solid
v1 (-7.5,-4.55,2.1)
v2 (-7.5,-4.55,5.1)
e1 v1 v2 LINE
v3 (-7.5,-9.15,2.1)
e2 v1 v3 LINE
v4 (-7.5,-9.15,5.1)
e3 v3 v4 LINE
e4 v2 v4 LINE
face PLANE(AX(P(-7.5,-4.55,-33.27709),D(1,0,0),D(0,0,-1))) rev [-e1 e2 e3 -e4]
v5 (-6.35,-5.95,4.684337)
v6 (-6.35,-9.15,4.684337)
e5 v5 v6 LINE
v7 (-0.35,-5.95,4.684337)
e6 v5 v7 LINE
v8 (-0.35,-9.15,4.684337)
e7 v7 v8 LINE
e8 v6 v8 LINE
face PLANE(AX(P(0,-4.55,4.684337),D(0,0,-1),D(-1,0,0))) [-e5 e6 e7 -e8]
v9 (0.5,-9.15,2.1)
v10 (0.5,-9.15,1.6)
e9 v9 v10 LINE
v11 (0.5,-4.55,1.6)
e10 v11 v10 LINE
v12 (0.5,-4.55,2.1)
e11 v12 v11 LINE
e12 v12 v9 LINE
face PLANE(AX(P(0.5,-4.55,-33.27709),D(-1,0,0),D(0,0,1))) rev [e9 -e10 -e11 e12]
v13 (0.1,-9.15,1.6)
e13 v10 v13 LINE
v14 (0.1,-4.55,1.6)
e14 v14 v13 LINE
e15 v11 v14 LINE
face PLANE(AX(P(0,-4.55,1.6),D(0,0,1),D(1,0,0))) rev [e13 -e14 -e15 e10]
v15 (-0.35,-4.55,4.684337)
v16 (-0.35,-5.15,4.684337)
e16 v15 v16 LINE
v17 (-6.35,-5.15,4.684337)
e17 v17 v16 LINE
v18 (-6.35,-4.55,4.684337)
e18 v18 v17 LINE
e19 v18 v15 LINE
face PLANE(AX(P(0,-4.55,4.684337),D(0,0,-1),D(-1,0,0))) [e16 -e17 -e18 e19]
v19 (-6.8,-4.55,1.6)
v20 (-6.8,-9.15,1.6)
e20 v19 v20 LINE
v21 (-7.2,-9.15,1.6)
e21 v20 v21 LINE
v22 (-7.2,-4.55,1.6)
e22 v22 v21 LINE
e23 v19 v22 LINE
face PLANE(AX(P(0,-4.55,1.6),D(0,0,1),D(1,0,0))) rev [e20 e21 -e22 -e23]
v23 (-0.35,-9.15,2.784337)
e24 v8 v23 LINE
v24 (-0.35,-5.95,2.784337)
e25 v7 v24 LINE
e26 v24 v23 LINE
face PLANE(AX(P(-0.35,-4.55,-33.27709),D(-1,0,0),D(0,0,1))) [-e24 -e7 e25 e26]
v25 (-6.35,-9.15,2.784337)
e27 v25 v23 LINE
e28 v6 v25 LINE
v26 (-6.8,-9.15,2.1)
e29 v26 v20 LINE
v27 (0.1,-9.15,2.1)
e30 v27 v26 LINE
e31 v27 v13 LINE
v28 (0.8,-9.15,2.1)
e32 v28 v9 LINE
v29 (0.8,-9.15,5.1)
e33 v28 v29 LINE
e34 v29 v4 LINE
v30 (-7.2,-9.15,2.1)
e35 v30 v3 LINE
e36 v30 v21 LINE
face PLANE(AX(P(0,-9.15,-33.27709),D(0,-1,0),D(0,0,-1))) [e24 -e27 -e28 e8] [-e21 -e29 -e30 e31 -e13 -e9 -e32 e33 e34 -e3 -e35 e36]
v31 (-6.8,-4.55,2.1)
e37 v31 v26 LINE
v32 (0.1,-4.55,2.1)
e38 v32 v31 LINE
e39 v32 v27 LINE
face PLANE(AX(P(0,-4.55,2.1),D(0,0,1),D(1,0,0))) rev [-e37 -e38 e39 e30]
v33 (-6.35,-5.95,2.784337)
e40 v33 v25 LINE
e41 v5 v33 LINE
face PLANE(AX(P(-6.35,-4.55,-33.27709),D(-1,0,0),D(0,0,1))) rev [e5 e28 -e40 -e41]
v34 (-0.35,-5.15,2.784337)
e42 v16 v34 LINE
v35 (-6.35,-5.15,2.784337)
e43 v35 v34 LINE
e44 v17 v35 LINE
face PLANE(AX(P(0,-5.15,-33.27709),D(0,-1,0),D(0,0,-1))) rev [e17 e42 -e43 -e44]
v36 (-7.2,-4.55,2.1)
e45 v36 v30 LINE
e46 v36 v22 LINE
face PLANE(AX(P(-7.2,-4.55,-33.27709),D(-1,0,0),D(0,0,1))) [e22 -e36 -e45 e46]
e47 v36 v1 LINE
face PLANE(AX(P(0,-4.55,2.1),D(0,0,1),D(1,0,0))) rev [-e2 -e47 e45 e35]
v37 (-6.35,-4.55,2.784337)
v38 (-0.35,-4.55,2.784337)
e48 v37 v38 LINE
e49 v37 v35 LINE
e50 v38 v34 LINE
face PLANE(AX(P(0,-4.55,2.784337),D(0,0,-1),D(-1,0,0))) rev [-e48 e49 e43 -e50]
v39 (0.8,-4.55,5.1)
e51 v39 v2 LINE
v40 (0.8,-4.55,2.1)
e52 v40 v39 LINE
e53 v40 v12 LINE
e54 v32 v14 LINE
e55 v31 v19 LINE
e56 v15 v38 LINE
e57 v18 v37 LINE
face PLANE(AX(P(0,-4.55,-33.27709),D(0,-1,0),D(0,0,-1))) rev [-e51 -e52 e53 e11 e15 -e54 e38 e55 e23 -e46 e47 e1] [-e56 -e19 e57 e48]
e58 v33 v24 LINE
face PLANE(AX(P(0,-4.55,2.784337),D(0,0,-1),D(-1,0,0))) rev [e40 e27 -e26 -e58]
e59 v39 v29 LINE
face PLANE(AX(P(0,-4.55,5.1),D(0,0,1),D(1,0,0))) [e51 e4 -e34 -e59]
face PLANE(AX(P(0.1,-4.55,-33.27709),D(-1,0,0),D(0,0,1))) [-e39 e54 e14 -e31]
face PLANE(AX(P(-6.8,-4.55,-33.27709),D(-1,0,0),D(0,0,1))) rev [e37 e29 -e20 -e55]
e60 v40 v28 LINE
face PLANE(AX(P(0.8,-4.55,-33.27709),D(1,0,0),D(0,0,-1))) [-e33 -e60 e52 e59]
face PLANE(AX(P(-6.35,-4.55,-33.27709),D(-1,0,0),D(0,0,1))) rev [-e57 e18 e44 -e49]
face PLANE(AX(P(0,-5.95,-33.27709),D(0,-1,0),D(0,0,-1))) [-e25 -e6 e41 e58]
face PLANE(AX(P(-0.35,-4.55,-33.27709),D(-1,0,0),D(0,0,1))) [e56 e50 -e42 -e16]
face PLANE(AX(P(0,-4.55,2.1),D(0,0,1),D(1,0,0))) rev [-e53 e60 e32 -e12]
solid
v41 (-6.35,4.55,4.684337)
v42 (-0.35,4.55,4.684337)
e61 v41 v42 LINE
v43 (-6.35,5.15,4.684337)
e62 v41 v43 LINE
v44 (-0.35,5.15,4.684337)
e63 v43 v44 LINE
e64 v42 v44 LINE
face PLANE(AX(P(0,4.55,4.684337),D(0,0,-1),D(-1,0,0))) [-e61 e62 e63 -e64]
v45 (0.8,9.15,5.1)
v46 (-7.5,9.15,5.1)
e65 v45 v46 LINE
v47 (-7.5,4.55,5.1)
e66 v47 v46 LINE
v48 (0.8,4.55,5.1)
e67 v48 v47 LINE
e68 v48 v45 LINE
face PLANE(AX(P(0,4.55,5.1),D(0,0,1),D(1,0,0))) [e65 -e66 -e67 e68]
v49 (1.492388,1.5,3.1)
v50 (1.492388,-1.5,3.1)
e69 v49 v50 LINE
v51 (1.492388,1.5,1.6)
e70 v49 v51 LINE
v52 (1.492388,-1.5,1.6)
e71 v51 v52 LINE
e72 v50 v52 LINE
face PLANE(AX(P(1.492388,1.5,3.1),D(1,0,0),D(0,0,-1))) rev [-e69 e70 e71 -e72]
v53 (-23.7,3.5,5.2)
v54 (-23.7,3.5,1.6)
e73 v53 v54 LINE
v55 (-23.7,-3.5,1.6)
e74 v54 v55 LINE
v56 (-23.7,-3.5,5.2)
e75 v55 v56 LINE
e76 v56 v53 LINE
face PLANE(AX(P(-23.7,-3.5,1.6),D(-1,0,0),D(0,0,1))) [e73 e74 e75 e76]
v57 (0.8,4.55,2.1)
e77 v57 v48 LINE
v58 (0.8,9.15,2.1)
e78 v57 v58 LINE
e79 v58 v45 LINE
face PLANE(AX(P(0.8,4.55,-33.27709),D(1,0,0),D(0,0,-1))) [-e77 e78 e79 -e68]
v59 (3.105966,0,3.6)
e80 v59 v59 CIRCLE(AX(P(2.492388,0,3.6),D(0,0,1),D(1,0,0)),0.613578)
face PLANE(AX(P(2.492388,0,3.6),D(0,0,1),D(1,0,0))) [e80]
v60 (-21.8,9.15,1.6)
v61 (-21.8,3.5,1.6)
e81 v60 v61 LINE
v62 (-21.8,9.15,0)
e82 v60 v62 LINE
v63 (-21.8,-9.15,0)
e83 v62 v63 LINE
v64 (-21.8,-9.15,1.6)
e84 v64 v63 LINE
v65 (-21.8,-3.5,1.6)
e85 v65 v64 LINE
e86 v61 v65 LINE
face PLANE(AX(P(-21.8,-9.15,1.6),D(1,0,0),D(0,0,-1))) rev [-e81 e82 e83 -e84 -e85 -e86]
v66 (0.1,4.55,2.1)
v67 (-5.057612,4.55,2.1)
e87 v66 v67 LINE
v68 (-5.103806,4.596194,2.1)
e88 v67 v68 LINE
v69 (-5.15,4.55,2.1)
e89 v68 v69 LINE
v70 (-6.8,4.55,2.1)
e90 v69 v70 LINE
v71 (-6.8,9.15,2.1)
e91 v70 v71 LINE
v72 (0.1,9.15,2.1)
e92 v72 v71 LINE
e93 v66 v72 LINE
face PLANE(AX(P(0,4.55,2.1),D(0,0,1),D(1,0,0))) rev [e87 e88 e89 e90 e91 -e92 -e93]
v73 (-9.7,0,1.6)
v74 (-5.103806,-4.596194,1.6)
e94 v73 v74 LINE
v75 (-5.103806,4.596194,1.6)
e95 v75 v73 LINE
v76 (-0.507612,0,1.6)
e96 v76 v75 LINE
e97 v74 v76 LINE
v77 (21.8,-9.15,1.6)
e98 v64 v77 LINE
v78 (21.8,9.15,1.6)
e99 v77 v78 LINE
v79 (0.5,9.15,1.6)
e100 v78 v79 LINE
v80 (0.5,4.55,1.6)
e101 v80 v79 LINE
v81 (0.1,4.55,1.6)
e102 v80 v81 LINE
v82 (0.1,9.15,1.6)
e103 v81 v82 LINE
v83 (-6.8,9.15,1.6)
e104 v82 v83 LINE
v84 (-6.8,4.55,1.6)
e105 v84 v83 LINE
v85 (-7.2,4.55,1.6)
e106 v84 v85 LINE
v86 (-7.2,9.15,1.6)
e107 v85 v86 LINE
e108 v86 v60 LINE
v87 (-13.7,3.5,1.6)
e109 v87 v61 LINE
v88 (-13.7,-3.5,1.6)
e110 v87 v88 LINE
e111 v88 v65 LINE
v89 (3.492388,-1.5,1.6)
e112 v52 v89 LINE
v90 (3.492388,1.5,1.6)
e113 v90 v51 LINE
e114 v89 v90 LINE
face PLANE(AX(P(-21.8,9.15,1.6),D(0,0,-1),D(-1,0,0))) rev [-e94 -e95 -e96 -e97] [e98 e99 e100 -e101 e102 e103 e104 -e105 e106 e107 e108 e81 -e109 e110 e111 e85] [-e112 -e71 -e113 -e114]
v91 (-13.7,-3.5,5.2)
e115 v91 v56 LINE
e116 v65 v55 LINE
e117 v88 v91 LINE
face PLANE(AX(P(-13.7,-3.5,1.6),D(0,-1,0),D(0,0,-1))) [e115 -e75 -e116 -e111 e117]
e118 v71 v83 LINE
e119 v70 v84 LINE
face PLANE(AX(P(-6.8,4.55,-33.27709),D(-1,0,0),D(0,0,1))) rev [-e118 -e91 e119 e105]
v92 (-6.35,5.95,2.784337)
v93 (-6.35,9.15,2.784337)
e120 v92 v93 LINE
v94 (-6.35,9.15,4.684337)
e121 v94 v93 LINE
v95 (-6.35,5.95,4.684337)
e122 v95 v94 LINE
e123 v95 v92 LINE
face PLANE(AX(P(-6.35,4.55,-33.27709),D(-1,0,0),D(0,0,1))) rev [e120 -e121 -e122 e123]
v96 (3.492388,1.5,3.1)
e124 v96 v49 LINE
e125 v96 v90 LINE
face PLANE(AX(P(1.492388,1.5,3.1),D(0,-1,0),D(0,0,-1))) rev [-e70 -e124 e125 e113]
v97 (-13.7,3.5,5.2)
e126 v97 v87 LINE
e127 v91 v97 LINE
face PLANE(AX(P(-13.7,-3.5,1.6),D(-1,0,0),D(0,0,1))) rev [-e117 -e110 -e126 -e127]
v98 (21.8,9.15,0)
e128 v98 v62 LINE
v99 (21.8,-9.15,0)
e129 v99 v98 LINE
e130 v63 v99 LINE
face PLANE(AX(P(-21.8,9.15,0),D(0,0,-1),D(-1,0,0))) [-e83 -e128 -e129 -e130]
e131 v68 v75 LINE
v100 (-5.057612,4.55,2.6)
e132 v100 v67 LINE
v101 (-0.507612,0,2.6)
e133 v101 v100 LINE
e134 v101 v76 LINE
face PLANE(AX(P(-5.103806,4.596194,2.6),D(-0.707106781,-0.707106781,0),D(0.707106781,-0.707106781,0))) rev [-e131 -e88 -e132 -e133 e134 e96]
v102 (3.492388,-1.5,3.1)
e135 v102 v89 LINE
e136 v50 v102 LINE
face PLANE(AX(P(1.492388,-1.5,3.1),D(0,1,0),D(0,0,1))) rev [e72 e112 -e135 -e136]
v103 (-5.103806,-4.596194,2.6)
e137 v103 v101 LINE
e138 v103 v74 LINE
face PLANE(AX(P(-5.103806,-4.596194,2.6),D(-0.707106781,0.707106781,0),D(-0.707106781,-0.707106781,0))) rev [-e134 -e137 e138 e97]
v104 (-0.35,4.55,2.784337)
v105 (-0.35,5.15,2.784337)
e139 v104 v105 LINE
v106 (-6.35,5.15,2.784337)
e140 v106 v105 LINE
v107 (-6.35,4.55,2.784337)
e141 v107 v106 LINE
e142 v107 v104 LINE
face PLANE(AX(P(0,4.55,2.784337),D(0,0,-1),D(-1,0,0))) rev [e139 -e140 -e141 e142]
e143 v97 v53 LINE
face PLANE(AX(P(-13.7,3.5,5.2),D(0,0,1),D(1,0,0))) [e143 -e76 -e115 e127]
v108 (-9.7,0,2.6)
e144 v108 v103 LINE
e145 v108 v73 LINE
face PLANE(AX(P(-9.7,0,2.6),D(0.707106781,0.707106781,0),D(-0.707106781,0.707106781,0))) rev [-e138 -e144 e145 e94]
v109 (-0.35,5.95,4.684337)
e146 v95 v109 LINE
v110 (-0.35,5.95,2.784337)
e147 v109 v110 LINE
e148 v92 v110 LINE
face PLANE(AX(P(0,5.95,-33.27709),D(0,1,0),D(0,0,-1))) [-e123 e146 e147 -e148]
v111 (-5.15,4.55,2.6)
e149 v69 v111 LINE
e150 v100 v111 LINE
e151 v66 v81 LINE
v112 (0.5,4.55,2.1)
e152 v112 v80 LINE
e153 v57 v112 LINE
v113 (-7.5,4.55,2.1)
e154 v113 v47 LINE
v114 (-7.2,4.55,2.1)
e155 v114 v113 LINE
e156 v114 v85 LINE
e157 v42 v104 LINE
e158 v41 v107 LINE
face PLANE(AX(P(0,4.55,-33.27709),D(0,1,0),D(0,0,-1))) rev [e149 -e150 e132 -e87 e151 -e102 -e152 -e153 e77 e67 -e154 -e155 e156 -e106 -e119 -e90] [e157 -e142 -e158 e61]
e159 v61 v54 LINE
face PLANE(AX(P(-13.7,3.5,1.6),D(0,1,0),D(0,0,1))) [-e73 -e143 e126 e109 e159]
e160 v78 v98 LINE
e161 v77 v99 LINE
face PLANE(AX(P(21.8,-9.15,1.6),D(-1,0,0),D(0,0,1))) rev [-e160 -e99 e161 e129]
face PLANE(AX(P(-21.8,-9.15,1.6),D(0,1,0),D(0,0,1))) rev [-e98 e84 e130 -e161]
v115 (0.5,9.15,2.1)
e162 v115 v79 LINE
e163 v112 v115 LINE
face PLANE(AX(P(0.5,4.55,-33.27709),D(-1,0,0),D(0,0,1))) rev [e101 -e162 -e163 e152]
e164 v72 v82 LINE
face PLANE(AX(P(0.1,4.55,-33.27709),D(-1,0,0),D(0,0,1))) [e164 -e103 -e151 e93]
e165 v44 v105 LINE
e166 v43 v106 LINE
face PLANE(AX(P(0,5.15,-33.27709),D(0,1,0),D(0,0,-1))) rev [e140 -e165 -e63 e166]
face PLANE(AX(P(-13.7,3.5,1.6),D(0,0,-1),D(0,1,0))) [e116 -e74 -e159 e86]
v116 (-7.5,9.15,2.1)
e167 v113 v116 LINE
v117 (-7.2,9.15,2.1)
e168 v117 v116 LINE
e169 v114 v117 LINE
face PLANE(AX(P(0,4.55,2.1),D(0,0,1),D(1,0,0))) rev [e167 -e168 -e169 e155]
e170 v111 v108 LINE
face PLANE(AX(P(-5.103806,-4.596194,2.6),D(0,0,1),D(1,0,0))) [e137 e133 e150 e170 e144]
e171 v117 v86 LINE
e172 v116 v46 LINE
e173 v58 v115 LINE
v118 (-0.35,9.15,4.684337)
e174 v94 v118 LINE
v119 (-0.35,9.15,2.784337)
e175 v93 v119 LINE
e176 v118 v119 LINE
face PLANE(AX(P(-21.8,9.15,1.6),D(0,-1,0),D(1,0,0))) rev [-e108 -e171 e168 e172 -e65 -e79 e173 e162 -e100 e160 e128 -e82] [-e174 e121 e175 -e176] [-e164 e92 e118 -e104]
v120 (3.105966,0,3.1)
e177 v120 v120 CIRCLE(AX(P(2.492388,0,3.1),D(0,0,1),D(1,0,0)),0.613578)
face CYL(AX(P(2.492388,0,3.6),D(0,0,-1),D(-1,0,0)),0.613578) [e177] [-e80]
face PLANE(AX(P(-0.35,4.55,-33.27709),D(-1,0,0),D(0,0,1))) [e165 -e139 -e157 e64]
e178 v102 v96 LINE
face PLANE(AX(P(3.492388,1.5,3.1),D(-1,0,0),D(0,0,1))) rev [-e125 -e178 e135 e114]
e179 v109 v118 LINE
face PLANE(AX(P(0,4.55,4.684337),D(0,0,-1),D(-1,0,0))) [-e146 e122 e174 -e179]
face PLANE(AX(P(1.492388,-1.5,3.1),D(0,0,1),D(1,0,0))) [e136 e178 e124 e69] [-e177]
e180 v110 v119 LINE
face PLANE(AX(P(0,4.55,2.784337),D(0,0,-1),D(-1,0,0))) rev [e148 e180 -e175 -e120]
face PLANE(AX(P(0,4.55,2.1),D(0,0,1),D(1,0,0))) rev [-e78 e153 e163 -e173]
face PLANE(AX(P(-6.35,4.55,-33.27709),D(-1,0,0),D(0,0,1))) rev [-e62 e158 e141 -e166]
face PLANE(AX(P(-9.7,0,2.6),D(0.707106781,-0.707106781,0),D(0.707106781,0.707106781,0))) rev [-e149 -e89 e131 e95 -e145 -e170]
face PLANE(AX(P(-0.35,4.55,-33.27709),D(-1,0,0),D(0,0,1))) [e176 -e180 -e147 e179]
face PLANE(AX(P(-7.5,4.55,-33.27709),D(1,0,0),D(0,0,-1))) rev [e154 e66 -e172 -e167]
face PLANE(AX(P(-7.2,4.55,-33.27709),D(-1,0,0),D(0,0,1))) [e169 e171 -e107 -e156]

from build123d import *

# Parameters (mm, degrees)
SKETCH1_W            = 43.6
SKETCH1_H            = 18.3
BOSS_EXTRUDE1_DEPTH  = 1.6
USB_START            = 1.9
SKETCH2_W            = 3.6
SKETCH2_H            = 7
USB_CONNECTOR_DEPTH  = 10
MICROPROCESSOR_DEPTH = 1
SKETCH4_W            = 2
SKETCH4_H            = 3
BUTTON_BASE_DEPTH    = 1.5
SKETCH5_R            = 0.613578093
BUTTON_DEPTH         = 0.5
SKETCH6_W            = 8.3
SKETCH6_H            = 3
SKETCH6_W_2          = 6
SKETCH6_H_2          = 1.9
SKETCH6_W_3          = 0.4
SKETCH6_H_3          = 0.5
JST_X_6_DEPTH        = 4.6
BOSS_EXTRUDE8_START  = -4
SKETCH6_3_W          = 6
SKETCH6_3_H          = 1.9
BOSS_EXTRUDE8_DEPTH  = 0.8


with BuildPart() as part:
    # Sketch1 → Boss-Extrude1 (new body)
    with BuildSketch(Plane.XY):
        Rectangle(SKETCH1_W, SKETCH1_H)
    extrude(amount=BOSS_EXTRUDE1_DEPTH)

    # Sketch2 → USB Connector (add)
    with BuildSketch(Plane.ZY.offset(21.8).offset(USB_START)):
        with Locations((3.4, 0)):
            Rectangle(SKETCH2_W, SKETCH2_H)
    extrude(amount=-USB_CONNECTOR_DEPTH)

    # Sketch3 → MicroProcessor (add)
    with BuildSketch(Plane.XY.offset(1.6)):
        Polygon((-9.7, 0), (-5.103805922, 4.596194078), (-0.507611845, 0), (-5.103805922, -4.596194078), align=None)
    extrude(amount=MICROPROCESSOR_DEPTH)

    # Sketch4 → Button Base (add)
    with BuildSketch(Plane.XY.offset(1.6)):
        with Locations((2.492388155, 0)):
            Rectangle(SKETCH4_W, SKETCH4_H)
    extrude(amount=BUTTON_BASE_DEPTH)

    # Sketch5 → Button (add)
    with BuildSketch(Plane.XY.offset(3.1)):
        with Locations((2.492388155, 0)):
            Circle(SKETCH5_R)
    extrude(amount=BUTTON_DEPTH)


with BuildPart() as body_2:
    # Sketch6 → JST x 6 (new body)
    # profile 1 of 3: a face of its own
    with BuildSketch(Plane.XZ.offset(9.15)):
        with Locations((-3.35, 3.6)):
            Rectangle(SKETCH6_W, SKETCH6_H)
        with Locations((-3.35, 3.734337349)):
            Rectangle(SKETCH6_W_2, SKETCH6_H_2, mode=Mode.SUBTRACT)
    # profile 2 of 3: a face of its own
    with BuildSketch(Plane.XZ.offset(9.15)):
        with Locations((-7, 1.85)):
            Rectangle(SKETCH6_W_3, SKETCH6_H_3)
    # profile 3 of 3: a face of its own
    with BuildSketch(Plane.XZ.offset(9.15)):
        with Locations((0.3, 1.85)):
            Rectangle(SKETCH6_W_3, SKETCH6_H_3)
    jst_x_6 = extrude(amount=-JST_X_6_DEPTH)

    # Sketch6<3> → Boss-Extrude8 (add)
    with BuildSketch(Plane.XZ.offset(9.15).offset(BOSS_EXTRUDE8_START)):
        with Locations((-3.35, 3.734337349)):
            Rectangle(SKETCH6_3_W, SKETCH6_3_H)
    boss_extrude8 = extrude(amount=BOSS_EXTRUDE8_DEPTH)


with BuildPart() as part_1:
    add(part.part)

    # Mirror5: JST x 6, Boss-Extrude8 across plane
    add(jst_x_6.mirror(Plane.ZX))
    add(boss_extrude8.mirror(Plane.ZX))


solid = Compound([body_2.part, part_1.part])
